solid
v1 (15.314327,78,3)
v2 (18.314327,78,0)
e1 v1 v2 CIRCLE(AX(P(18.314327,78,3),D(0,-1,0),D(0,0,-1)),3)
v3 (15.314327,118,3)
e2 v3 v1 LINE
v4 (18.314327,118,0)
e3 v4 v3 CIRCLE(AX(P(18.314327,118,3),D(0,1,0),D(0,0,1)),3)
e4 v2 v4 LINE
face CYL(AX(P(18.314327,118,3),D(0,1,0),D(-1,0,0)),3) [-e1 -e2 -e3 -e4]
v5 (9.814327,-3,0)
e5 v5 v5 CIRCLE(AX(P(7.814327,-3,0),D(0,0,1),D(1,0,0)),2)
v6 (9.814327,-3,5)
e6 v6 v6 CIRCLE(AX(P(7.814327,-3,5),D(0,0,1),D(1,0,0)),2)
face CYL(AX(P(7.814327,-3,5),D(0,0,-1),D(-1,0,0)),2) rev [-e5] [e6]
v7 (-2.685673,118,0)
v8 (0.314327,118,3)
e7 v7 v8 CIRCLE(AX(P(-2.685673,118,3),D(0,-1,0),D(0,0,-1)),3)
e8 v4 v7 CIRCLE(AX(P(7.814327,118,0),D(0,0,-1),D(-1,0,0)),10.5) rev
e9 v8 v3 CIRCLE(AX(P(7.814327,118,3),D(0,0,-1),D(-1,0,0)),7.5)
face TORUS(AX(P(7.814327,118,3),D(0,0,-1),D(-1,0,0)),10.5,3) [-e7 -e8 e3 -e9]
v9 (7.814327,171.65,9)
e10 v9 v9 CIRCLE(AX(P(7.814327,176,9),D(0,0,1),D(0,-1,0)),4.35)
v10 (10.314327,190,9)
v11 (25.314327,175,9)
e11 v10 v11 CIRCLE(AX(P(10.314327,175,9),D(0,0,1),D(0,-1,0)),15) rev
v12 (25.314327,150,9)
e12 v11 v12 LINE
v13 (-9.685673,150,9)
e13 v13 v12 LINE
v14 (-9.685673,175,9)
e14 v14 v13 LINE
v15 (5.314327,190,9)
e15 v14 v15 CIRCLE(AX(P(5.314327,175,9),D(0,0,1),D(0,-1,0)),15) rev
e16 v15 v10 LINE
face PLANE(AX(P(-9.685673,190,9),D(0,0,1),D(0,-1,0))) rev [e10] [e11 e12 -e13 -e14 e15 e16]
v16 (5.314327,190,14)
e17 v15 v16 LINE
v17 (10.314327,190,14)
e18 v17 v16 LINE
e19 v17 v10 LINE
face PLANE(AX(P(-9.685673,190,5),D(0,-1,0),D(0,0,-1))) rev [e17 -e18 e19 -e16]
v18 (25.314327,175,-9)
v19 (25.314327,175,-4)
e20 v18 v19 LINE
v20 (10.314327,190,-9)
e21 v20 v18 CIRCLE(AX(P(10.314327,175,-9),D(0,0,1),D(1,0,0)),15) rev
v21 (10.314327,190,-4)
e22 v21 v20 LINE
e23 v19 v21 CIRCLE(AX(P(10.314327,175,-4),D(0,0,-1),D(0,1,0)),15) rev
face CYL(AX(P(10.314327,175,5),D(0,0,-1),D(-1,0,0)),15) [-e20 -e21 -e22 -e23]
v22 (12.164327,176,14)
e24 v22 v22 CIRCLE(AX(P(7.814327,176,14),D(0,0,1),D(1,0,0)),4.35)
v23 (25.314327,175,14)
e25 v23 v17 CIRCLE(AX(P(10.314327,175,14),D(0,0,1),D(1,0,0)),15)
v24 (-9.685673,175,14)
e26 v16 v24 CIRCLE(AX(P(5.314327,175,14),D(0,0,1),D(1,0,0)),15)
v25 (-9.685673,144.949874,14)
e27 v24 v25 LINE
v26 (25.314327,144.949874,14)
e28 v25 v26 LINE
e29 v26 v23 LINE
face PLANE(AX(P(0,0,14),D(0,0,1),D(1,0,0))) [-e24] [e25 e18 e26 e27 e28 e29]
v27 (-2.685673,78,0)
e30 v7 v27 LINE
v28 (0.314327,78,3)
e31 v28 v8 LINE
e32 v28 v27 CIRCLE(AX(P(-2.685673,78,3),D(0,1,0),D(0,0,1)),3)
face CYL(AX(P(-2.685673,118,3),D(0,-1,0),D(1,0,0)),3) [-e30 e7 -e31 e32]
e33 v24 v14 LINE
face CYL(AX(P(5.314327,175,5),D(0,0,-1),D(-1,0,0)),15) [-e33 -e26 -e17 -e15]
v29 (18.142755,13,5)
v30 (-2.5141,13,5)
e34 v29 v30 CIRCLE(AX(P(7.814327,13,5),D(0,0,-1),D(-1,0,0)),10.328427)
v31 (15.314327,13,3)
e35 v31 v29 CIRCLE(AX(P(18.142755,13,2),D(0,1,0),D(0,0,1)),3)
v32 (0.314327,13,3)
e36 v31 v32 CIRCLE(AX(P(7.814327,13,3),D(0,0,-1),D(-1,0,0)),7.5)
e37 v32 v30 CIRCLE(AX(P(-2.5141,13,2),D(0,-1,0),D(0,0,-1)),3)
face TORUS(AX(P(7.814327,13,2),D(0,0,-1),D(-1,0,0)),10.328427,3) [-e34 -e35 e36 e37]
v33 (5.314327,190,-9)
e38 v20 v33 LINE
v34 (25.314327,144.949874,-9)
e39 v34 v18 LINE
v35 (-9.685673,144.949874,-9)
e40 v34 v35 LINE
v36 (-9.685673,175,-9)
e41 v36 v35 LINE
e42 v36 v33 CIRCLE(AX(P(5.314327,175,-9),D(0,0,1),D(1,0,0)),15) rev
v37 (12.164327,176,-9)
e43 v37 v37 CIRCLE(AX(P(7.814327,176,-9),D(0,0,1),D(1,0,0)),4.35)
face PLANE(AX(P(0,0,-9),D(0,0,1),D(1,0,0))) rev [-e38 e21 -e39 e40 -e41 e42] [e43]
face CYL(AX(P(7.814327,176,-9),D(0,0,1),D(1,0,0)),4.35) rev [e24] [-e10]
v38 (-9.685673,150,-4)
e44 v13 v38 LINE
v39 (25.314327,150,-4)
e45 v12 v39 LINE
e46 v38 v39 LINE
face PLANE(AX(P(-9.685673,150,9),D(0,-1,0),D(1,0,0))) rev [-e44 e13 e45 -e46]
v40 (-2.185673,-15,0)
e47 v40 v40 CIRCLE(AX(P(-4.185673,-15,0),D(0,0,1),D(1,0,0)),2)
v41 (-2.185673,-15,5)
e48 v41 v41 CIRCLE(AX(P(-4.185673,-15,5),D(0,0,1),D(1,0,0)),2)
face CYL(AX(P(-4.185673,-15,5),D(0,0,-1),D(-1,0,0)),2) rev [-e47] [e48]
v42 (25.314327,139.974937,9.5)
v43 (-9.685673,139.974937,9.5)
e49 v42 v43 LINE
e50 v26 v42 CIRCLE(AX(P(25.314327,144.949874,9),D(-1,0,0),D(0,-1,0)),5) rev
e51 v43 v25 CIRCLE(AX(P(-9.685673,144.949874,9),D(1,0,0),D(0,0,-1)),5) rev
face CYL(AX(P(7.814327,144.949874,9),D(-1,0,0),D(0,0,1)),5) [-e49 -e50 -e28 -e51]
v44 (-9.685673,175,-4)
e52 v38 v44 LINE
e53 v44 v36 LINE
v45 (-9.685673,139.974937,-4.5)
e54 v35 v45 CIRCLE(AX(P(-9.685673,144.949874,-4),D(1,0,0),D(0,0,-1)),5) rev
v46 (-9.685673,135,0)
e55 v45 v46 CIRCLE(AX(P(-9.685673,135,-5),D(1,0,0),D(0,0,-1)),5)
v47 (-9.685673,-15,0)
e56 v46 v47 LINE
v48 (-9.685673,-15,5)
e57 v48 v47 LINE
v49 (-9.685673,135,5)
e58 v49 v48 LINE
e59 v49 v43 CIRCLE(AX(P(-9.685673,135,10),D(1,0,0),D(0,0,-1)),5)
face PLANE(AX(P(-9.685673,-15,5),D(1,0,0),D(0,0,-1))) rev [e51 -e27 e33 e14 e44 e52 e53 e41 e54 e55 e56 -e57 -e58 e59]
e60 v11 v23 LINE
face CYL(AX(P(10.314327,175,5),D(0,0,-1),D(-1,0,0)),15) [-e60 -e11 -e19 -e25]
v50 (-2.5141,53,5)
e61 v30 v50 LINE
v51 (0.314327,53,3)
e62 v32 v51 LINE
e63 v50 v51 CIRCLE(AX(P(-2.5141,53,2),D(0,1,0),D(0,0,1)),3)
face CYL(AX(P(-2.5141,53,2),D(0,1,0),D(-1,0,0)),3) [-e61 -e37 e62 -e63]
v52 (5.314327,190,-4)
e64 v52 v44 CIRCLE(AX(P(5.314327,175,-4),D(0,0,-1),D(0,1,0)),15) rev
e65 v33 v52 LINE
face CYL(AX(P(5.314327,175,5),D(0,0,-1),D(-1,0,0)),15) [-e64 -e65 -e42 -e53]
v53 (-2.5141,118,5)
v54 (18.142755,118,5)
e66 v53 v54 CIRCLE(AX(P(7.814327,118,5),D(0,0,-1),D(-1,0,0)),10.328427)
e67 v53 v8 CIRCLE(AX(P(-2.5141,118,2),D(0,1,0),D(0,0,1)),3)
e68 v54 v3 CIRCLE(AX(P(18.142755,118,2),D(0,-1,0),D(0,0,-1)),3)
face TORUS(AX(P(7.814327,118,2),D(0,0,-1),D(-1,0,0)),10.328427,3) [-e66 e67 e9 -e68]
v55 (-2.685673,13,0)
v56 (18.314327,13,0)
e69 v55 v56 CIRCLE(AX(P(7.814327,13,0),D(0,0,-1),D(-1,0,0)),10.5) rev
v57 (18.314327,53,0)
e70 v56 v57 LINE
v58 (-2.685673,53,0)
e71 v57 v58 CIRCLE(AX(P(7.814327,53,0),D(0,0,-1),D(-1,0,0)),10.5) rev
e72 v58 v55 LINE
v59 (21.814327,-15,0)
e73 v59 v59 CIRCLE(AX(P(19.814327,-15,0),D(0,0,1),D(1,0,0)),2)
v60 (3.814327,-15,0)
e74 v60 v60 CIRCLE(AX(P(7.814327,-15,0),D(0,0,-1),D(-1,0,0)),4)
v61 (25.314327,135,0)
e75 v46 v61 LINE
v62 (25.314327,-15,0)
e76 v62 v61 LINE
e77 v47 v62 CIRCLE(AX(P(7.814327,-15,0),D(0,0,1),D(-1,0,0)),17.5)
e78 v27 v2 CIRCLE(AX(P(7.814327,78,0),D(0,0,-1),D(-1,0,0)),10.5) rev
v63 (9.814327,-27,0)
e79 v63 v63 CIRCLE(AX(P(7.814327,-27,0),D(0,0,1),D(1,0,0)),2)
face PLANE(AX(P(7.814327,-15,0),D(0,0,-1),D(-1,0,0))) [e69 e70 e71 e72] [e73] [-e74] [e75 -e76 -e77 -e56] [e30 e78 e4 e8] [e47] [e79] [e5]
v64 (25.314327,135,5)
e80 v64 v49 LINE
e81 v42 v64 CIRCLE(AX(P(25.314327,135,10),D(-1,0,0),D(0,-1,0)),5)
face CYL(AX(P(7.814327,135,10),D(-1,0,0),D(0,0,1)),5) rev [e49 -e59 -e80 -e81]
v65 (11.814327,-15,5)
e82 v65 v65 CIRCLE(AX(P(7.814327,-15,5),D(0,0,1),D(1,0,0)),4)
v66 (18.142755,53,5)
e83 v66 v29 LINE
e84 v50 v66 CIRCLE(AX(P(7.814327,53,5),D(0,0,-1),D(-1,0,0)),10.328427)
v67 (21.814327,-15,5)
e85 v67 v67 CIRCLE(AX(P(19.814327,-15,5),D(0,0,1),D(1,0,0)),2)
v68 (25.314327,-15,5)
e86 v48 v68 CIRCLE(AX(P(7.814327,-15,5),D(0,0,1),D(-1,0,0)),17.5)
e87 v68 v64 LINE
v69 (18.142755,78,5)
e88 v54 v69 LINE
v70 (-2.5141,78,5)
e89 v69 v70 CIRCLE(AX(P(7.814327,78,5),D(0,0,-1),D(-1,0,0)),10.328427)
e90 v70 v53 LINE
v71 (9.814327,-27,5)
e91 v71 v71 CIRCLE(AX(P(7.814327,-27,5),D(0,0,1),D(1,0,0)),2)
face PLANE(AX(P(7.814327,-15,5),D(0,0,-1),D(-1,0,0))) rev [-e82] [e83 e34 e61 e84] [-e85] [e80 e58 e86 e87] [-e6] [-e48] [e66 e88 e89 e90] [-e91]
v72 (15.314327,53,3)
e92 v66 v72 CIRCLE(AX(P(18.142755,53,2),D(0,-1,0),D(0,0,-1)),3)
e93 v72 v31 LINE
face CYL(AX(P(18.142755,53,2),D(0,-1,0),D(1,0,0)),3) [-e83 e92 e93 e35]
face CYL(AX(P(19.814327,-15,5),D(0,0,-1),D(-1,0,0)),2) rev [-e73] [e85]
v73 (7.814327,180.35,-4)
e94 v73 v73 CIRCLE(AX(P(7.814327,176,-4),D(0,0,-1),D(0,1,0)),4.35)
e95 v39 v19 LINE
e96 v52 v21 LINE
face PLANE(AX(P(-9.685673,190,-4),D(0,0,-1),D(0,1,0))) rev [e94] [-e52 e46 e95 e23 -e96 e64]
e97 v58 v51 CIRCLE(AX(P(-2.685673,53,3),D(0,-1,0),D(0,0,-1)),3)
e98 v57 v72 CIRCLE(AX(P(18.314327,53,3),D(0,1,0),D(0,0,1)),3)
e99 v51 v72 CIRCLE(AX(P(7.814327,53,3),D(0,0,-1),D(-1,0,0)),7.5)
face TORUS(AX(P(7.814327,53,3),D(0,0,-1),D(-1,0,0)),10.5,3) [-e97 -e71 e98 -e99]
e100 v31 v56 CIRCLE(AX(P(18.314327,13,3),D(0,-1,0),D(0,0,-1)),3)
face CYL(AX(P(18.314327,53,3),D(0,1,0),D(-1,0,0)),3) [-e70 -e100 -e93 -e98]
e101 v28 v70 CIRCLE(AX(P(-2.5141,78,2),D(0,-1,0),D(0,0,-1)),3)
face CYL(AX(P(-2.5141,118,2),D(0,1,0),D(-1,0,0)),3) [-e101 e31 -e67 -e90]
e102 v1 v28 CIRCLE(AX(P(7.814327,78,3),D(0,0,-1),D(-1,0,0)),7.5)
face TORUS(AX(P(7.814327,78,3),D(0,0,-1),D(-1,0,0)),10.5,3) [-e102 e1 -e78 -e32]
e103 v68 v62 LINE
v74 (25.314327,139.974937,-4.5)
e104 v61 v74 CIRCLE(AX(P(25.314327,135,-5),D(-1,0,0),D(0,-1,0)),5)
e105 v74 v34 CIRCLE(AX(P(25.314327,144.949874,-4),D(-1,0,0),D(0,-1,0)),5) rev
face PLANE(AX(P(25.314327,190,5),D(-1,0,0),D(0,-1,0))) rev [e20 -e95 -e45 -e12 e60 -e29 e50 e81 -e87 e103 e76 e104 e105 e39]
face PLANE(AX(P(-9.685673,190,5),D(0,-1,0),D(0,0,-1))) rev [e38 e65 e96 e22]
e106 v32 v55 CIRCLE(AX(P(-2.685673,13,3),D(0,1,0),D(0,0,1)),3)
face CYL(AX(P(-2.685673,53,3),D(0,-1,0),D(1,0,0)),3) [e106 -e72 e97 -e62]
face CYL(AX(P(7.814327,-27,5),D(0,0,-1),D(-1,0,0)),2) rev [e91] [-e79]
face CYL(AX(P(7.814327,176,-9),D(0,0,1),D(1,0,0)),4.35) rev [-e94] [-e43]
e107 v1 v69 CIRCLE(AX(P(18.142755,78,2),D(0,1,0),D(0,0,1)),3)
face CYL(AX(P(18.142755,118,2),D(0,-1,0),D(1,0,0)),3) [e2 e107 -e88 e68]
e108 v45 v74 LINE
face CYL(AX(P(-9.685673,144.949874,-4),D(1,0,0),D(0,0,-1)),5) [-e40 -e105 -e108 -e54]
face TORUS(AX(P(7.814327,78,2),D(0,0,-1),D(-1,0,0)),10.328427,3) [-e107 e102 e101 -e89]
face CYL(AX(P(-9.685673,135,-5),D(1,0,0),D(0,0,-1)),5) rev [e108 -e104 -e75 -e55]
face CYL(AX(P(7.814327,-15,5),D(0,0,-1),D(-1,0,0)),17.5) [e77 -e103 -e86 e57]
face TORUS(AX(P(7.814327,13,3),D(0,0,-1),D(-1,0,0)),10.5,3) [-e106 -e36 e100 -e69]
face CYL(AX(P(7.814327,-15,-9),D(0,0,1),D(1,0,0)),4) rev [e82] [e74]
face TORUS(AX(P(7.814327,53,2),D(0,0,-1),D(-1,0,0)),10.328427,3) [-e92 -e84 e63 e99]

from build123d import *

# Parameters (mm, degrees)
SKETCH1_R                = 2
BOSS_EXTRUDE2_DEPTH      = 5
BOSS_EXTRUDE3_DEPTH      = 9
BOSS_EXTRUDE3_DEPTH_BACK = 14
SKETCH3_W                = 35
SKETCH3_H                = 50
SKETCH4_W                = 13
SKETCH4_H                = 40
CUT_EXTRUDE1_DEPTH       = 194.703381488
SKETCH5_R                = 4.35
CUT_EXTRUDE2_DEPTH       = 194.053917795
CUT_EXTRUDE3_DEPTH       = 193.189529309
FILLET14_R               = 15
FILLET15_R               = 15
FILLET16_R               = 15
FILLET17_R               = 15
FILLET18_R               = 5
FILLET19_R               = 5
FILLET20_R               = 5
FILLET21_R               = 5
FILLET22_R               = 3
FILLET23_R               = 3
FILLET24_R               = 3
FILLET25_R               = 3
SKETCH7_R                = 4
CUT_EXTRUDE4_DEPTH       = 193.189529428


with BuildPart() as part:
    # Sketch1 → Boss-Extrude2 (new body)
    with BuildSketch(Plane.XY):
        with BuildLine():
            Line((-9.685672515, -15), (-9.685672515, 190))
            Line((-9.685672515, 190), (25.314327485, 190))
            Line((25.314327485, 190), (25.314327485, -15))
            ThreePointArc((25.314327485, -15), (7.814327485, -32.5), (-9.685672515, -15))
        make_face()
        with Locations((19.814327485, -15)):
            Circle(SKETCH1_R, mode=Mode.SUBTRACT)
        with Locations((7.814327485, -27)):
            Circle(SKETCH1_R, mode=Mode.SUBTRACT)
        with Locations((-4.185672515, -15)):
            Circle(SKETCH1_R, mode=Mode.SUBTRACT)
        with Locations((7.814327485, -3)):
            Circle(SKETCH1_R, mode=Mode.SUBTRACT)
    extrude(amount=BOSS_EXTRUDE2_DEPTH)

    # Sketch3 → Boss-Extrude3 (add, two sides: drawn at the far end of the back side and taken through both)
    with BuildSketch(Plane.XY.offset(5).offset(-BOSS_EXTRUDE3_DEPTH_BACK)):
        with Locations((7.814327485, 165)):
            Rectangle(SKETCH3_W, SKETCH3_H)
    extrude(amount=BOSS_EXTRUDE3_DEPTH + BOSS_EXTRUDE3_DEPTH_BACK)

    # Sketch4 → Cut-Extrude1 (cut, through all)
    with BuildSketch(Plane(origin=(25.314327485, 0, 0), x_dir=(0, 0, -1), z_dir=(1, 0, 0))):
        with Locations((-2.5, 170)):
            Rectangle(SKETCH4_W, SKETCH4_H)
    extrude(amount=-CUT_EXTRUDE1_DEPTH, mode=Mode.SUBTRACT)

    # Sketch5 → Cut-Extrude2 (cut, through all)
    with BuildSketch(Plane.XY.offset(14)):
        with Locations((7.814327485, 176)):
            Circle(SKETCH5_R)
    extrude(amount=-CUT_EXTRUDE2_DEPTH, mode=Mode.SUBTRACT)

    # Sketch6 → Cut-Extrude3 (cut, through all)
    with BuildSketch(Plane.XY.offset(5)):
        with BuildLine():
            Line((15.314327485, 118), (15.314327485, 78))
            ThreePointArc((15.314327485, 78), (7.814327485, 70.5), (0.314327485, 78))
            Line((0.314327485, 78), (0.314327485, 118))
            ThreePointArc((0.314327485, 118), (7.814327485, 125.5), (15.314327485, 118))
        make_face()
        with BuildLine():
            Line((15.314327485, 53), (15.314327485, 13))
            ThreePointArc((15.314327485, 13), (7.814327485, 5.5), (0.314327485, 13))
            Line((0.314327485, 13), (0.314327485, 53))
            ThreePointArc((0.314327485, 53), (7.814327485, 60.5), (15.314327485, 53))
        make_face()
    extrude(amount=-CUT_EXTRUDE3_DEPTH, mode=Mode.SUBTRACT)

    # Fillet14
    fillet14_edges = [part.edges().sort_by_distance(p)[0] for p in [
        (25.314327485, 190, 11.5),
    ]]
    fillet(fillet14_edges, radius=FILLET14_R)

    # Fillet15
    fillet15_edges = [part.edges().sort_by_distance(p)[0] for p in [
        (-9.685672515, 190, 11.5),
    ]]
    fillet(fillet15_edges, radius=FILLET15_R)

    # Fillet16
    fillet16_edges = [part.edges().sort_by_distance(p)[0] for p in [
        (-9.685672515, 190, -6.5),
    ]]
    fillet(fillet16_edges, radius=FILLET16_R)

    # Fillet17
    fillet17_edges = [part.edges().sort_by_distance(p)[0] for p in [
        (25.314327485, 190, -6.5),
    ]]
    fillet(fillet17_edges, radius=FILLET17_R)

    # Fillet18
    fillet18_edges = [part.edges().sort_by_distance(p)[0] for p in [
        (7.814327485, 140, 5),
    ]]
    fillet(fillet18_edges, radius=FILLET18_R)

    # Fillet19
    fillet19_edges = [part.edges().sort_by_distance(p)[0] for p in [
        (7.814327485, 140, 0),
    ]]
    fillet(fillet19_edges, radius=FILLET19_R)

    # Fillet20
    fillet20_edges = [part.edges().sort_by_distance(p)[0] for p in [
        (7.814327485, 140, -9),
    ]]
    fillet(fillet20_edges, radius=FILLET20_R)

    # Fillet21
    fillet21_edges = [part.edges().sort_by_distance(p)[0] for p in [
        (7.814327485, 140, 14),
    ]]
    fillet(fillet21_edges, radius=FILLET21_R)

    # Fillet22
    fillet22_edges = [part.edges().sort_by_distance(p)[0] for p in [
        (0.314327485, 98, 0),
        (7.814327485, 70.5, 0),
        (15.314327485, 98, 0),
        (7.814327485, 125.5, 0),
    ]]
    fillet(fillet22_edges, radius=FILLET22_R)

    # Fillet23
    # the kernel refuses this fillet: 3 mm, written as the material it takes off along each edge
    with BuildSketch(Plane(origin=(15.314327485, 118, 5), x_dir=(0, 0, -1), z_dir=(0, -1, 0)), Plane(origin=(0.314327485, 78, 5), x_dir=(0, 0, -1), z_dir=(0, 1, 0))) as fillet23_piece_1:
        with BuildLine():
            CenterArc((3, 2.828427125), FILLET23_R, 180, 70.528779366)
            Line((0, 2.828427125), (-0.06, 2.828427125))
            Line((-0.06, 2.828427125), (-0.06, 0))
            Line((-0.06, 0), (0, -0.06))
            ThreePointArc((0, -0.06), (1, -0.06), (1.98, -0.056568542))
            Line((1.98, -0.056568542), (2, 0))
        make_face()
    extrude(amount=40, mode=Mode.SUBTRACT)
    with BuildSketch(Plane(origin=(7.814327485, 78, 5), x_dir=(1, 0, 0), z_dir=(0, 1, 0))) as fillet23_piece_2:
        with BuildLine():
            CenterArc((10.328427125, 3), FILLET23_R, 199.471220634, 70.528779366)
            Line((10.328427125, 0), (10.328427125, -0.06))
            Line((10.328427125, -0.06), (7.5, -0.06))
            Line((7.5, -0.06), (7.44, 0))
            ThreePointArc((7.44, 0), (7.44, 1), (7.443431458, 1.98))
            Line((7.443431458, 1.98), (7.5, 2))
        make_face()
    revolve(axis=Axis((7.814327485, 78, 5), (0, 0, -1)), revolution_arc=180, mode=Mode.SUBTRACT)
    with BuildSketch(Plane(origin=(7.814327485, 118, 5), x_dir=(-1, 0, 0), z_dir=(0, -1, 0))) as fillet23_piece_3:
        with BuildLine():
            CenterArc((10.328427125, 3), FILLET23_R, 199.471220634, 70.528779366)
            Line((10.328427125, 0), (10.328427125, -0.06))
            Line((10.328427125, -0.06), (7.5, -0.06))
            Line((7.5, -0.06), (7.44, 0))
            ThreePointArc((7.44, 0), (7.44, 1), (7.443431458, 1.98))
            Line((7.443431458, 1.98), (7.5, 2))
        make_face()
    revolve(axis=Axis((7.814327485, 118, 5), (0, 0, -1)), revolution_arc=180, mode=Mode.SUBTRACT)

    # Fillet24
    fillet24_edges = [part.edges().sort_by_distance(p)[0] for p in [
        (0.314327485, 33, 0),
        (7.814327485, 5.5, 0),
        (15.314327485, 33, 0),
        (7.814327485, 60.5, 0),
    ]]
    fillet(fillet24_edges, radius=FILLET24_R)

    # Fillet25
    # the kernel refuses this fillet: 3 mm, written as the material it takes off along each edge
    with BuildSketch(Plane(origin=(15.314327485, 53, 5), x_dir=(0, 0, -1), z_dir=(0, -1, 0)), Plane(origin=(0.314327485, 13, 5), x_dir=(0, 0, -1), z_dir=(0, 1, 0))) as fillet25_piece_1:
        with BuildLine():
            CenterArc((3, 2.828427125), FILLET25_R, 180, 70.528779366)
            Line((0, 2.828427125), (-0.06, 2.828427125))
            Line((-0.06, 2.828427125), (-0.06, 0))
            Line((-0.06, 0), (0, -0.06))
            ThreePointArc((0, -0.06), (1, -0.06), (1.98, -0.056568542))
            Line((1.98, -0.056568542), (2, 0))
        make_face()
    extrude(amount=40, mode=Mode.SUBTRACT)
    with BuildSketch(Plane(origin=(7.814327485, 13, 5), x_dir=(1, 0, 0), z_dir=(0, 1, 0))) as fillet25_piece_2:
        with BuildLine():
            CenterArc((10.328427125, 3), FILLET25_R, 199.471220634, 70.528779366)
            Line((10.328427125, 0), (10.328427125, -0.06))
            Line((10.328427125, -0.06), (7.5, -0.06))
            Line((7.5, -0.06), (7.44, 0))
            ThreePointArc((7.44, 0), (7.44, 1), (7.443431458, 1.98))
            Line((7.443431458, 1.98), (7.5, 2))
        make_face()
    revolve(axis=Axis((7.814327485, 13, 5), (0, 0, -1)), revolution_arc=180, mode=Mode.SUBTRACT)
    with BuildSketch(Plane(origin=(7.814327485, 53, 5), x_dir=(-1, 0, 0), z_dir=(0, -1, 0))) as fillet25_piece_3:
        with BuildLine():
            CenterArc((10.328427125, 3), FILLET25_R, 199.471220634, 70.528779366)
            Line((10.328427125, 0), (10.328427125, -0.06))
            Line((10.328427125, -0.06), (7.5, -0.06))
            Line((7.5, -0.06), (7.44, 0))
            ThreePointArc((7.44, 0), (7.44, 1), (7.443431458, 1.98))
            Line((7.443431458, 1.98), (7.5, 2))
        make_face()
    revolve(axis=Axis((7.814327485, 53, 5), (0, 0, -1)), revolution_arc=180, mode=Mode.SUBTRACT)

    # Sketch7 → Cut-Extrude4 (cut, through all)
    with BuildSketch(Plane.XY.offset(5)):
        with Locations((7.814327485, -15)):
            Circle(SKETCH7_R)
    extrude(amount=-CUT_EXTRUDE4_DEPTH, mode=Mode.SUBTRACT)


solid = part.part
